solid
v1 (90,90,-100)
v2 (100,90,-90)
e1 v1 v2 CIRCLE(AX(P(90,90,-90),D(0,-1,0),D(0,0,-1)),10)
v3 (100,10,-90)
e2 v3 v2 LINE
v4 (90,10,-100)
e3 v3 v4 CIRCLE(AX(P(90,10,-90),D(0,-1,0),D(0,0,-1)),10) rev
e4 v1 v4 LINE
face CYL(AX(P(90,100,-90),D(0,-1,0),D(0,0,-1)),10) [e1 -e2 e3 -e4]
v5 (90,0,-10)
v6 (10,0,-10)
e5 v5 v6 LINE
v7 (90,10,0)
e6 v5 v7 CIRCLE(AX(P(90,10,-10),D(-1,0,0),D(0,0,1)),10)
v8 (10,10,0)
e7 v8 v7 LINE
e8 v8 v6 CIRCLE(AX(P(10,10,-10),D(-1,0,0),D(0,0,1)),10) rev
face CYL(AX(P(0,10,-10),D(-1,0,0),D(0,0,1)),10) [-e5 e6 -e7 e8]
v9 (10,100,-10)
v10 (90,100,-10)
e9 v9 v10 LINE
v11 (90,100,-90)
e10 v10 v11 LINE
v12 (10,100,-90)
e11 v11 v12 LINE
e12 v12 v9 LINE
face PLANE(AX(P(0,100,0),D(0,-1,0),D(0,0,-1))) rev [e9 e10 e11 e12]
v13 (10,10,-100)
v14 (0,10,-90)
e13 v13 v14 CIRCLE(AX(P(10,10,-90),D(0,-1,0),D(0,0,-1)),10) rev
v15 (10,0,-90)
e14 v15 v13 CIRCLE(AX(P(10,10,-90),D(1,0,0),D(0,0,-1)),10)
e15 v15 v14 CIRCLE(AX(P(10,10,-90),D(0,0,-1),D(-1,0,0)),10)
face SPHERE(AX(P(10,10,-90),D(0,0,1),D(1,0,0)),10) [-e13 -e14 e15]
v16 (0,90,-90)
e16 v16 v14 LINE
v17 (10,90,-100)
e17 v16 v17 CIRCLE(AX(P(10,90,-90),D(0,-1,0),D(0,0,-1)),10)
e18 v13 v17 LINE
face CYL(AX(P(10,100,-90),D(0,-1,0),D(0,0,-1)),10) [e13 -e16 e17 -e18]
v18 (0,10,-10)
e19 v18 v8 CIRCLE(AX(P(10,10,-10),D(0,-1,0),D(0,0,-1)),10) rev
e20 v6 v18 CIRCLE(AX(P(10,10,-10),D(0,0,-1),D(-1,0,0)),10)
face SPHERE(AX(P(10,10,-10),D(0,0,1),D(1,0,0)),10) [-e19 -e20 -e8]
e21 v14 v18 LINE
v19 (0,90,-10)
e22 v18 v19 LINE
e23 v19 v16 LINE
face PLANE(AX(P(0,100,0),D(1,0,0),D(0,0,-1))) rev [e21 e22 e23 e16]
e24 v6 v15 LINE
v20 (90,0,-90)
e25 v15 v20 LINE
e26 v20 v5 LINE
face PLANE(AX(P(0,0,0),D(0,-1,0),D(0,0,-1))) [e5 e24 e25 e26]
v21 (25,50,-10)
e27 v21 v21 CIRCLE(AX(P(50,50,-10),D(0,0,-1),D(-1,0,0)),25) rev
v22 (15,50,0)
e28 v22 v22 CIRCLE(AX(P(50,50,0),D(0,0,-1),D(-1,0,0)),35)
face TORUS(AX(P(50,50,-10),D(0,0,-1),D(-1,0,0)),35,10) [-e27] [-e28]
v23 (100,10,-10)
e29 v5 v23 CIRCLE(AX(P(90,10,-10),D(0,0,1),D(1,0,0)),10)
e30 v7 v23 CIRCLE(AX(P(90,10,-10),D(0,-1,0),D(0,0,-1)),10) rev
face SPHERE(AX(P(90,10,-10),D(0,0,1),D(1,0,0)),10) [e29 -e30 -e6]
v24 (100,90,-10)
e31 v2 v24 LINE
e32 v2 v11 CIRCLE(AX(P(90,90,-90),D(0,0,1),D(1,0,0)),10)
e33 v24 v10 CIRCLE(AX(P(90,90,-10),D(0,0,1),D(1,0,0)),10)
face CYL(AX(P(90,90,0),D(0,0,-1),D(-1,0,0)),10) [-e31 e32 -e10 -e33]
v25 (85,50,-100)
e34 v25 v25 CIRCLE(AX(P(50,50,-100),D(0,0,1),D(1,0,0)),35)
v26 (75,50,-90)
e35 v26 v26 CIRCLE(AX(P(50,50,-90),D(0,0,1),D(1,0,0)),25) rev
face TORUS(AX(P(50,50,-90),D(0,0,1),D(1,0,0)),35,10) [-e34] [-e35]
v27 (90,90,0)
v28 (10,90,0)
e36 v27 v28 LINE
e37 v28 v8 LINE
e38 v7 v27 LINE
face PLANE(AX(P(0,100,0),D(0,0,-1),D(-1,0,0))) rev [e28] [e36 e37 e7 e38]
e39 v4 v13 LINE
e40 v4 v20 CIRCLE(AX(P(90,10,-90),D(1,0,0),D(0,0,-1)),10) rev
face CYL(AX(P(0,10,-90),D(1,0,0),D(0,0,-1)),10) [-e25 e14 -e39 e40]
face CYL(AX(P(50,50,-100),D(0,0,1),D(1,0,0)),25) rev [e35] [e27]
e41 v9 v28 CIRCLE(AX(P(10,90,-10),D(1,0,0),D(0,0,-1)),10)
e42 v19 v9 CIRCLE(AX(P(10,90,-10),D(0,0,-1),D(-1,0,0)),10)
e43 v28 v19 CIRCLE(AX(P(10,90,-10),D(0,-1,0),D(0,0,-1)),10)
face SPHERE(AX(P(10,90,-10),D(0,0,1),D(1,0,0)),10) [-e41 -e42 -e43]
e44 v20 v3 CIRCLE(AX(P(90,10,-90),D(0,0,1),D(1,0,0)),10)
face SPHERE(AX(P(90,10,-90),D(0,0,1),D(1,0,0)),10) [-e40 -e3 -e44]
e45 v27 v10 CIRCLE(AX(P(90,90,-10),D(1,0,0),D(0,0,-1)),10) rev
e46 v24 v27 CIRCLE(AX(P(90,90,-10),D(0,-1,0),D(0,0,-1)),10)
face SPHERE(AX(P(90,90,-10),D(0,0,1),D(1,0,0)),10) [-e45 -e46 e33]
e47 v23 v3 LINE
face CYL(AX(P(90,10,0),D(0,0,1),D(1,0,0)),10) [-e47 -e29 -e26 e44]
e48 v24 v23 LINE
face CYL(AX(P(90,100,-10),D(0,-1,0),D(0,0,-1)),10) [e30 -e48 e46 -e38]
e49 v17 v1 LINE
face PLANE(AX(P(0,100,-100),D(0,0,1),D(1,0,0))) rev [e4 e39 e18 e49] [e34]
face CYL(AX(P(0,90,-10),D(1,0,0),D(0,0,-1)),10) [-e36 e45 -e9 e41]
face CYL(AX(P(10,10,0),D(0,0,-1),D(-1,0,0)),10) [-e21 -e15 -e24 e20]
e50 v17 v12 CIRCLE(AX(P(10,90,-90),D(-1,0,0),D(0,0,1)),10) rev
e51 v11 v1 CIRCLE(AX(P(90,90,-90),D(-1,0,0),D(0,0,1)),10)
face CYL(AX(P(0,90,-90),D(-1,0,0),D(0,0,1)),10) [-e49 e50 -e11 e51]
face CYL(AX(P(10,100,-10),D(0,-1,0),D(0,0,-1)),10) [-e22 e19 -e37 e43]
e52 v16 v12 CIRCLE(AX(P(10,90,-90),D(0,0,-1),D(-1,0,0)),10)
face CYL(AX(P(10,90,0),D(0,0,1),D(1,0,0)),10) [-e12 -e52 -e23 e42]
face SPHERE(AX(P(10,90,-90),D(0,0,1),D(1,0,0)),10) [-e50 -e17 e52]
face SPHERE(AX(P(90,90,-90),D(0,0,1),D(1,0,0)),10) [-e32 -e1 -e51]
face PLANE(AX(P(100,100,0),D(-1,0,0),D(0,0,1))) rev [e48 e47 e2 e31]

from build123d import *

# Parameters (mm, degrees)
SKETCH2_W           = 100
SKETCH2_H           = 100
BOSS_EXTRUDE1_DEPTH = 100
SKETCH3_R           = 25
CUT_EXTRUDE1_DEPTH  = 100
FILLET1_R           = 10
FILLET2_R           = 10
FILLET3_R           = 10
FILLET4_R           = 10


with BuildPart() as part:
    # Sketch2 → Boss-Extrude1 (new body)
    with BuildSketch(Plane(origin=(0, 0, 0), x_dir=(1, 0, 0), z_dir=(0, 1, 0))):
        with Locations((50, 50)):
            Rectangle(SKETCH2_W, SKETCH2_H)
    extrude(amount=BOSS_EXTRUDE1_DEPTH)

    # Sketch3 → Cut-Extrude1 (cut)
    with BuildSketch(Plane.XY):
        with Locations((50, 50)):
            Circle(SKETCH3_R)
    extrude(amount=-CUT_EXTRUDE1_DEPTH, mode=Mode.SUBTRACT)

    # Fillet1
    fillet1_edges = [part.edges().sort_by_distance(p)[0] for p in [
        (25, 50, 0),
        (50, 0, 0),
        (100, 50, 0),
        (0, 50, 0),
        (50, 100, 0),
    ]]
    fillet(fillet1_edges, radius=FILLET1_R)

    # Fillet2
    fillet2_edges = [part.edges().sort_by_distance(p)[0] for p in [
        (25, 50, -100),
        (50, 100, -100),
        (50, 0, -100),
        (0, 50, -100),
        (100, 50, -100),
    ]]
    fillet(fillet2_edges, radius=FILLET2_R)

    # Fillet3
    # the kernel refuses this fillet: 10 mm, written as the material it takes off along each edge
    with BuildSketch(Plane(origin=(90, 90, -10), x_dir=(1, 0, 0), z_dir=(0, 1, 0))) as fillet3_piece_1_section:
        Polygon((0, 0), (FILLET3_R, 0), (FILLET3_R, -FILLET3_R), (0, -FILLET3_R), align=None)
    fillet3_piece_1 = extrude(amount=FILLET3_R, mode=Mode.PRIVATE)
    fillet3_piece_1 = fillet3_piece_1 - Plane(origin=(90, 90, -10), x_dir=(-0.7071067811865475, 0, -0.7071067811865475), z_dir=(0, 1, 0)) * Sphere(FILLET3_R, mode=Mode.PRIVATE)
    add(fillet3_piece_1, mode=Mode.SUBTRACT)
    with BuildSketch(Plane(origin=(90, 10, -10), x_dir=(0, -1, 0), z_dir=(1, 0, 0))) as fillet3_piece_2_section:
        Polygon((0, 0), (FILLET3_R, 0), (FILLET3_R, -FILLET3_R), (0, -FILLET3_R), align=None)
    fillet3_piece_2 = extrude(amount=FILLET3_R, mode=Mode.PRIVATE)
    fillet3_piece_2 = fillet3_piece_2 - Plane(origin=(90, 10, -10), x_dir=(0, 0.7071067811865475, -0.7071067811865475), z_dir=(1, 0, 0)) * Sphere(FILLET3_R, mode=Mode.PRIVATE)
    add(fillet3_piece_2, mode=Mode.SUBTRACT)
    with BuildSketch(Plane(origin=(90, 90, -90), x_dir=(1, 0, 0), z_dir=(0, 1, 0))) as fillet3_piece_3_section:
        Polygon((0, 0), (FILLET3_R, 0), (FILLET3_R, FILLET3_R), (0, FILLET3_R), align=None)
    fillet3_piece_3 = extrude(amount=FILLET3_R, mode=Mode.PRIVATE)
    fillet3_piece_3 = fillet3_piece_3 - Plane(origin=(90, 90, -90), x_dir=(-0.7071067811865475, 0, 0.7071067811865475), z_dir=(0, 1, 0)) * Sphere(FILLET3_R, mode=Mode.PRIVATE)
    add(fillet3_piece_3, mode=Mode.SUBTRACT)
    with BuildSketch(Plane(origin=(90, 10, -90), x_dir=(0, -1, 0), z_dir=(1, 0, 0))) as fillet3_piece_4_section:
        Polygon((0, 0), (FILLET3_R, 0), (FILLET3_R, FILLET3_R), (0, FILLET3_R), align=None)
    fillet3_piece_4 = extrude(amount=FILLET3_R, mode=Mode.PRIVATE)
    fillet3_piece_4 = fillet3_piece_4 - Plane(origin=(90, 10, -90), x_dir=(0, 0.7071067811865475, 0.7071067811865475), z_dir=(1, 0, 0)) * Sphere(FILLET3_R, mode=Mode.PRIVATE)
    add(fillet3_piece_4, mode=Mode.SUBTRACT)
    with BuildSketch(Plane(origin=(100, 100, -10), x_dir=(-1, 0, 0), z_dir=(0, 0, -1)), Plane(origin=(100, 0, -10), x_dir=(0, 1, 0), z_dir=(0, 0, -1))) as fillet3_piece_5:
        with BuildLine():
            CenterArc((FILLET3_R, -FILLET3_R), FILLET3_R, 90, 90)
            Line((0, -FILLET3_R), (0, 0))
            Line((0, 0), (FILLET3_R, 0))
        make_face()
    extrude(amount=80, mode=Mode.SUBTRACT)

    # Fillet4
    # the kernel refuses this fillet: 10 mm, written as the material it takes off along each edge
    with BuildSketch(Plane(origin=(10, 90, -10), x_dir=(-1, 0, 0), z_dir=(0, 1, 0))) as fillet4_piece_1_section:
        Polygon((0, 0), (FILLET4_R, 0), (FILLET4_R, FILLET4_R), (0, FILLET4_R), align=None)
    fillet4_piece_1 = extrude(amount=FILLET4_R, mode=Mode.PRIVATE)
    fillet4_piece_1 = fillet4_piece_1 - Plane(origin=(10, 90, -10), x_dir=(0.7071067811865475, 0, -0.7071067811865475), z_dir=(0, 1, 0)) * Sphere(FILLET4_R, mode=Mode.PRIVATE)
    add(fillet4_piece_1, mode=Mode.SUBTRACT)
    with BuildSketch(Plane(origin=(10, 10, -10), x_dir=(0, -1, 0), z_dir=(-1, 0, 0))) as fillet4_piece_2_section:
        Polygon((0, 0), (FILLET4_R, 0), (FILLET4_R, FILLET4_R), (0, FILLET4_R), align=None)
    fillet4_piece_2 = extrude(amount=FILLET4_R, mode=Mode.PRIVATE)
    fillet4_piece_2 = fillet4_piece_2 - Plane(origin=(10, 10, -10), x_dir=(0, 0.7071067811865475, -0.7071067811865475), z_dir=(-1, 0, 0)) * Sphere(FILLET4_R, mode=Mode.PRIVATE)
    add(fillet4_piece_2, mode=Mode.SUBTRACT)
    with BuildSketch(Plane(origin=(10, 90, -90), x_dir=(-1, 0, 0), z_dir=(0, 1, 0))) as fillet4_piece_3_section:
        Polygon((0, 0), (FILLET4_R, 0), (FILLET4_R, -FILLET4_R), (0, -FILLET4_R), align=None)
    fillet4_piece_3 = extrude(amount=FILLET4_R, mode=Mode.PRIVATE)
    fillet4_piece_3 = fillet4_piece_3 - Plane(origin=(10, 90, -90), x_dir=(0.7071067811865475, 0, 0.7071067811865475), z_dir=(0, 1, 0)) * Sphere(FILLET4_R, mode=Mode.PRIVATE)
    add(fillet4_piece_3, mode=Mode.SUBTRACT)
    with BuildSketch(Plane(origin=(10, 10, -90), x_dir=(0, -1, 0), z_dir=(-1, 0, 0))) as fillet4_piece_4_section:
        Polygon((0, 0), (FILLET4_R, 0), (FILLET4_R, -FILLET4_R), (0, -FILLET4_R), align=None)
    fillet4_piece_4 = extrude(amount=FILLET4_R, mode=Mode.PRIVATE)
    fillet4_piece_4 = fillet4_piece_4 - Plane(origin=(10, 10, -90), x_dir=(0, 0.7071067811865475, 0.7071067811865475), z_dir=(-1, 0, 0)) * Sphere(FILLET4_R, mode=Mode.PRIVATE)
    add(fillet4_piece_4, mode=Mode.SUBTRACT)
    with BuildSketch(Plane(origin=(0, 100, -90), x_dir=(1, 0, 0), z_dir=(0, 0, 1)), Plane(origin=(0, 0, -90), x_dir=(0, 1, 0), z_dir=(0, 0, 1))) as fillet4_piece_5:
        with BuildLine():
            CenterArc((FILLET4_R, -FILLET4_R), FILLET4_R, 90, 90)
            Line((0, -FILLET4_R), (0, 0))
            Line((0, 0), (FILLET4_R, 0))
        make_face()
    extrude(amount=80, mode=Mode.SUBTRACT)


solid = part.part
